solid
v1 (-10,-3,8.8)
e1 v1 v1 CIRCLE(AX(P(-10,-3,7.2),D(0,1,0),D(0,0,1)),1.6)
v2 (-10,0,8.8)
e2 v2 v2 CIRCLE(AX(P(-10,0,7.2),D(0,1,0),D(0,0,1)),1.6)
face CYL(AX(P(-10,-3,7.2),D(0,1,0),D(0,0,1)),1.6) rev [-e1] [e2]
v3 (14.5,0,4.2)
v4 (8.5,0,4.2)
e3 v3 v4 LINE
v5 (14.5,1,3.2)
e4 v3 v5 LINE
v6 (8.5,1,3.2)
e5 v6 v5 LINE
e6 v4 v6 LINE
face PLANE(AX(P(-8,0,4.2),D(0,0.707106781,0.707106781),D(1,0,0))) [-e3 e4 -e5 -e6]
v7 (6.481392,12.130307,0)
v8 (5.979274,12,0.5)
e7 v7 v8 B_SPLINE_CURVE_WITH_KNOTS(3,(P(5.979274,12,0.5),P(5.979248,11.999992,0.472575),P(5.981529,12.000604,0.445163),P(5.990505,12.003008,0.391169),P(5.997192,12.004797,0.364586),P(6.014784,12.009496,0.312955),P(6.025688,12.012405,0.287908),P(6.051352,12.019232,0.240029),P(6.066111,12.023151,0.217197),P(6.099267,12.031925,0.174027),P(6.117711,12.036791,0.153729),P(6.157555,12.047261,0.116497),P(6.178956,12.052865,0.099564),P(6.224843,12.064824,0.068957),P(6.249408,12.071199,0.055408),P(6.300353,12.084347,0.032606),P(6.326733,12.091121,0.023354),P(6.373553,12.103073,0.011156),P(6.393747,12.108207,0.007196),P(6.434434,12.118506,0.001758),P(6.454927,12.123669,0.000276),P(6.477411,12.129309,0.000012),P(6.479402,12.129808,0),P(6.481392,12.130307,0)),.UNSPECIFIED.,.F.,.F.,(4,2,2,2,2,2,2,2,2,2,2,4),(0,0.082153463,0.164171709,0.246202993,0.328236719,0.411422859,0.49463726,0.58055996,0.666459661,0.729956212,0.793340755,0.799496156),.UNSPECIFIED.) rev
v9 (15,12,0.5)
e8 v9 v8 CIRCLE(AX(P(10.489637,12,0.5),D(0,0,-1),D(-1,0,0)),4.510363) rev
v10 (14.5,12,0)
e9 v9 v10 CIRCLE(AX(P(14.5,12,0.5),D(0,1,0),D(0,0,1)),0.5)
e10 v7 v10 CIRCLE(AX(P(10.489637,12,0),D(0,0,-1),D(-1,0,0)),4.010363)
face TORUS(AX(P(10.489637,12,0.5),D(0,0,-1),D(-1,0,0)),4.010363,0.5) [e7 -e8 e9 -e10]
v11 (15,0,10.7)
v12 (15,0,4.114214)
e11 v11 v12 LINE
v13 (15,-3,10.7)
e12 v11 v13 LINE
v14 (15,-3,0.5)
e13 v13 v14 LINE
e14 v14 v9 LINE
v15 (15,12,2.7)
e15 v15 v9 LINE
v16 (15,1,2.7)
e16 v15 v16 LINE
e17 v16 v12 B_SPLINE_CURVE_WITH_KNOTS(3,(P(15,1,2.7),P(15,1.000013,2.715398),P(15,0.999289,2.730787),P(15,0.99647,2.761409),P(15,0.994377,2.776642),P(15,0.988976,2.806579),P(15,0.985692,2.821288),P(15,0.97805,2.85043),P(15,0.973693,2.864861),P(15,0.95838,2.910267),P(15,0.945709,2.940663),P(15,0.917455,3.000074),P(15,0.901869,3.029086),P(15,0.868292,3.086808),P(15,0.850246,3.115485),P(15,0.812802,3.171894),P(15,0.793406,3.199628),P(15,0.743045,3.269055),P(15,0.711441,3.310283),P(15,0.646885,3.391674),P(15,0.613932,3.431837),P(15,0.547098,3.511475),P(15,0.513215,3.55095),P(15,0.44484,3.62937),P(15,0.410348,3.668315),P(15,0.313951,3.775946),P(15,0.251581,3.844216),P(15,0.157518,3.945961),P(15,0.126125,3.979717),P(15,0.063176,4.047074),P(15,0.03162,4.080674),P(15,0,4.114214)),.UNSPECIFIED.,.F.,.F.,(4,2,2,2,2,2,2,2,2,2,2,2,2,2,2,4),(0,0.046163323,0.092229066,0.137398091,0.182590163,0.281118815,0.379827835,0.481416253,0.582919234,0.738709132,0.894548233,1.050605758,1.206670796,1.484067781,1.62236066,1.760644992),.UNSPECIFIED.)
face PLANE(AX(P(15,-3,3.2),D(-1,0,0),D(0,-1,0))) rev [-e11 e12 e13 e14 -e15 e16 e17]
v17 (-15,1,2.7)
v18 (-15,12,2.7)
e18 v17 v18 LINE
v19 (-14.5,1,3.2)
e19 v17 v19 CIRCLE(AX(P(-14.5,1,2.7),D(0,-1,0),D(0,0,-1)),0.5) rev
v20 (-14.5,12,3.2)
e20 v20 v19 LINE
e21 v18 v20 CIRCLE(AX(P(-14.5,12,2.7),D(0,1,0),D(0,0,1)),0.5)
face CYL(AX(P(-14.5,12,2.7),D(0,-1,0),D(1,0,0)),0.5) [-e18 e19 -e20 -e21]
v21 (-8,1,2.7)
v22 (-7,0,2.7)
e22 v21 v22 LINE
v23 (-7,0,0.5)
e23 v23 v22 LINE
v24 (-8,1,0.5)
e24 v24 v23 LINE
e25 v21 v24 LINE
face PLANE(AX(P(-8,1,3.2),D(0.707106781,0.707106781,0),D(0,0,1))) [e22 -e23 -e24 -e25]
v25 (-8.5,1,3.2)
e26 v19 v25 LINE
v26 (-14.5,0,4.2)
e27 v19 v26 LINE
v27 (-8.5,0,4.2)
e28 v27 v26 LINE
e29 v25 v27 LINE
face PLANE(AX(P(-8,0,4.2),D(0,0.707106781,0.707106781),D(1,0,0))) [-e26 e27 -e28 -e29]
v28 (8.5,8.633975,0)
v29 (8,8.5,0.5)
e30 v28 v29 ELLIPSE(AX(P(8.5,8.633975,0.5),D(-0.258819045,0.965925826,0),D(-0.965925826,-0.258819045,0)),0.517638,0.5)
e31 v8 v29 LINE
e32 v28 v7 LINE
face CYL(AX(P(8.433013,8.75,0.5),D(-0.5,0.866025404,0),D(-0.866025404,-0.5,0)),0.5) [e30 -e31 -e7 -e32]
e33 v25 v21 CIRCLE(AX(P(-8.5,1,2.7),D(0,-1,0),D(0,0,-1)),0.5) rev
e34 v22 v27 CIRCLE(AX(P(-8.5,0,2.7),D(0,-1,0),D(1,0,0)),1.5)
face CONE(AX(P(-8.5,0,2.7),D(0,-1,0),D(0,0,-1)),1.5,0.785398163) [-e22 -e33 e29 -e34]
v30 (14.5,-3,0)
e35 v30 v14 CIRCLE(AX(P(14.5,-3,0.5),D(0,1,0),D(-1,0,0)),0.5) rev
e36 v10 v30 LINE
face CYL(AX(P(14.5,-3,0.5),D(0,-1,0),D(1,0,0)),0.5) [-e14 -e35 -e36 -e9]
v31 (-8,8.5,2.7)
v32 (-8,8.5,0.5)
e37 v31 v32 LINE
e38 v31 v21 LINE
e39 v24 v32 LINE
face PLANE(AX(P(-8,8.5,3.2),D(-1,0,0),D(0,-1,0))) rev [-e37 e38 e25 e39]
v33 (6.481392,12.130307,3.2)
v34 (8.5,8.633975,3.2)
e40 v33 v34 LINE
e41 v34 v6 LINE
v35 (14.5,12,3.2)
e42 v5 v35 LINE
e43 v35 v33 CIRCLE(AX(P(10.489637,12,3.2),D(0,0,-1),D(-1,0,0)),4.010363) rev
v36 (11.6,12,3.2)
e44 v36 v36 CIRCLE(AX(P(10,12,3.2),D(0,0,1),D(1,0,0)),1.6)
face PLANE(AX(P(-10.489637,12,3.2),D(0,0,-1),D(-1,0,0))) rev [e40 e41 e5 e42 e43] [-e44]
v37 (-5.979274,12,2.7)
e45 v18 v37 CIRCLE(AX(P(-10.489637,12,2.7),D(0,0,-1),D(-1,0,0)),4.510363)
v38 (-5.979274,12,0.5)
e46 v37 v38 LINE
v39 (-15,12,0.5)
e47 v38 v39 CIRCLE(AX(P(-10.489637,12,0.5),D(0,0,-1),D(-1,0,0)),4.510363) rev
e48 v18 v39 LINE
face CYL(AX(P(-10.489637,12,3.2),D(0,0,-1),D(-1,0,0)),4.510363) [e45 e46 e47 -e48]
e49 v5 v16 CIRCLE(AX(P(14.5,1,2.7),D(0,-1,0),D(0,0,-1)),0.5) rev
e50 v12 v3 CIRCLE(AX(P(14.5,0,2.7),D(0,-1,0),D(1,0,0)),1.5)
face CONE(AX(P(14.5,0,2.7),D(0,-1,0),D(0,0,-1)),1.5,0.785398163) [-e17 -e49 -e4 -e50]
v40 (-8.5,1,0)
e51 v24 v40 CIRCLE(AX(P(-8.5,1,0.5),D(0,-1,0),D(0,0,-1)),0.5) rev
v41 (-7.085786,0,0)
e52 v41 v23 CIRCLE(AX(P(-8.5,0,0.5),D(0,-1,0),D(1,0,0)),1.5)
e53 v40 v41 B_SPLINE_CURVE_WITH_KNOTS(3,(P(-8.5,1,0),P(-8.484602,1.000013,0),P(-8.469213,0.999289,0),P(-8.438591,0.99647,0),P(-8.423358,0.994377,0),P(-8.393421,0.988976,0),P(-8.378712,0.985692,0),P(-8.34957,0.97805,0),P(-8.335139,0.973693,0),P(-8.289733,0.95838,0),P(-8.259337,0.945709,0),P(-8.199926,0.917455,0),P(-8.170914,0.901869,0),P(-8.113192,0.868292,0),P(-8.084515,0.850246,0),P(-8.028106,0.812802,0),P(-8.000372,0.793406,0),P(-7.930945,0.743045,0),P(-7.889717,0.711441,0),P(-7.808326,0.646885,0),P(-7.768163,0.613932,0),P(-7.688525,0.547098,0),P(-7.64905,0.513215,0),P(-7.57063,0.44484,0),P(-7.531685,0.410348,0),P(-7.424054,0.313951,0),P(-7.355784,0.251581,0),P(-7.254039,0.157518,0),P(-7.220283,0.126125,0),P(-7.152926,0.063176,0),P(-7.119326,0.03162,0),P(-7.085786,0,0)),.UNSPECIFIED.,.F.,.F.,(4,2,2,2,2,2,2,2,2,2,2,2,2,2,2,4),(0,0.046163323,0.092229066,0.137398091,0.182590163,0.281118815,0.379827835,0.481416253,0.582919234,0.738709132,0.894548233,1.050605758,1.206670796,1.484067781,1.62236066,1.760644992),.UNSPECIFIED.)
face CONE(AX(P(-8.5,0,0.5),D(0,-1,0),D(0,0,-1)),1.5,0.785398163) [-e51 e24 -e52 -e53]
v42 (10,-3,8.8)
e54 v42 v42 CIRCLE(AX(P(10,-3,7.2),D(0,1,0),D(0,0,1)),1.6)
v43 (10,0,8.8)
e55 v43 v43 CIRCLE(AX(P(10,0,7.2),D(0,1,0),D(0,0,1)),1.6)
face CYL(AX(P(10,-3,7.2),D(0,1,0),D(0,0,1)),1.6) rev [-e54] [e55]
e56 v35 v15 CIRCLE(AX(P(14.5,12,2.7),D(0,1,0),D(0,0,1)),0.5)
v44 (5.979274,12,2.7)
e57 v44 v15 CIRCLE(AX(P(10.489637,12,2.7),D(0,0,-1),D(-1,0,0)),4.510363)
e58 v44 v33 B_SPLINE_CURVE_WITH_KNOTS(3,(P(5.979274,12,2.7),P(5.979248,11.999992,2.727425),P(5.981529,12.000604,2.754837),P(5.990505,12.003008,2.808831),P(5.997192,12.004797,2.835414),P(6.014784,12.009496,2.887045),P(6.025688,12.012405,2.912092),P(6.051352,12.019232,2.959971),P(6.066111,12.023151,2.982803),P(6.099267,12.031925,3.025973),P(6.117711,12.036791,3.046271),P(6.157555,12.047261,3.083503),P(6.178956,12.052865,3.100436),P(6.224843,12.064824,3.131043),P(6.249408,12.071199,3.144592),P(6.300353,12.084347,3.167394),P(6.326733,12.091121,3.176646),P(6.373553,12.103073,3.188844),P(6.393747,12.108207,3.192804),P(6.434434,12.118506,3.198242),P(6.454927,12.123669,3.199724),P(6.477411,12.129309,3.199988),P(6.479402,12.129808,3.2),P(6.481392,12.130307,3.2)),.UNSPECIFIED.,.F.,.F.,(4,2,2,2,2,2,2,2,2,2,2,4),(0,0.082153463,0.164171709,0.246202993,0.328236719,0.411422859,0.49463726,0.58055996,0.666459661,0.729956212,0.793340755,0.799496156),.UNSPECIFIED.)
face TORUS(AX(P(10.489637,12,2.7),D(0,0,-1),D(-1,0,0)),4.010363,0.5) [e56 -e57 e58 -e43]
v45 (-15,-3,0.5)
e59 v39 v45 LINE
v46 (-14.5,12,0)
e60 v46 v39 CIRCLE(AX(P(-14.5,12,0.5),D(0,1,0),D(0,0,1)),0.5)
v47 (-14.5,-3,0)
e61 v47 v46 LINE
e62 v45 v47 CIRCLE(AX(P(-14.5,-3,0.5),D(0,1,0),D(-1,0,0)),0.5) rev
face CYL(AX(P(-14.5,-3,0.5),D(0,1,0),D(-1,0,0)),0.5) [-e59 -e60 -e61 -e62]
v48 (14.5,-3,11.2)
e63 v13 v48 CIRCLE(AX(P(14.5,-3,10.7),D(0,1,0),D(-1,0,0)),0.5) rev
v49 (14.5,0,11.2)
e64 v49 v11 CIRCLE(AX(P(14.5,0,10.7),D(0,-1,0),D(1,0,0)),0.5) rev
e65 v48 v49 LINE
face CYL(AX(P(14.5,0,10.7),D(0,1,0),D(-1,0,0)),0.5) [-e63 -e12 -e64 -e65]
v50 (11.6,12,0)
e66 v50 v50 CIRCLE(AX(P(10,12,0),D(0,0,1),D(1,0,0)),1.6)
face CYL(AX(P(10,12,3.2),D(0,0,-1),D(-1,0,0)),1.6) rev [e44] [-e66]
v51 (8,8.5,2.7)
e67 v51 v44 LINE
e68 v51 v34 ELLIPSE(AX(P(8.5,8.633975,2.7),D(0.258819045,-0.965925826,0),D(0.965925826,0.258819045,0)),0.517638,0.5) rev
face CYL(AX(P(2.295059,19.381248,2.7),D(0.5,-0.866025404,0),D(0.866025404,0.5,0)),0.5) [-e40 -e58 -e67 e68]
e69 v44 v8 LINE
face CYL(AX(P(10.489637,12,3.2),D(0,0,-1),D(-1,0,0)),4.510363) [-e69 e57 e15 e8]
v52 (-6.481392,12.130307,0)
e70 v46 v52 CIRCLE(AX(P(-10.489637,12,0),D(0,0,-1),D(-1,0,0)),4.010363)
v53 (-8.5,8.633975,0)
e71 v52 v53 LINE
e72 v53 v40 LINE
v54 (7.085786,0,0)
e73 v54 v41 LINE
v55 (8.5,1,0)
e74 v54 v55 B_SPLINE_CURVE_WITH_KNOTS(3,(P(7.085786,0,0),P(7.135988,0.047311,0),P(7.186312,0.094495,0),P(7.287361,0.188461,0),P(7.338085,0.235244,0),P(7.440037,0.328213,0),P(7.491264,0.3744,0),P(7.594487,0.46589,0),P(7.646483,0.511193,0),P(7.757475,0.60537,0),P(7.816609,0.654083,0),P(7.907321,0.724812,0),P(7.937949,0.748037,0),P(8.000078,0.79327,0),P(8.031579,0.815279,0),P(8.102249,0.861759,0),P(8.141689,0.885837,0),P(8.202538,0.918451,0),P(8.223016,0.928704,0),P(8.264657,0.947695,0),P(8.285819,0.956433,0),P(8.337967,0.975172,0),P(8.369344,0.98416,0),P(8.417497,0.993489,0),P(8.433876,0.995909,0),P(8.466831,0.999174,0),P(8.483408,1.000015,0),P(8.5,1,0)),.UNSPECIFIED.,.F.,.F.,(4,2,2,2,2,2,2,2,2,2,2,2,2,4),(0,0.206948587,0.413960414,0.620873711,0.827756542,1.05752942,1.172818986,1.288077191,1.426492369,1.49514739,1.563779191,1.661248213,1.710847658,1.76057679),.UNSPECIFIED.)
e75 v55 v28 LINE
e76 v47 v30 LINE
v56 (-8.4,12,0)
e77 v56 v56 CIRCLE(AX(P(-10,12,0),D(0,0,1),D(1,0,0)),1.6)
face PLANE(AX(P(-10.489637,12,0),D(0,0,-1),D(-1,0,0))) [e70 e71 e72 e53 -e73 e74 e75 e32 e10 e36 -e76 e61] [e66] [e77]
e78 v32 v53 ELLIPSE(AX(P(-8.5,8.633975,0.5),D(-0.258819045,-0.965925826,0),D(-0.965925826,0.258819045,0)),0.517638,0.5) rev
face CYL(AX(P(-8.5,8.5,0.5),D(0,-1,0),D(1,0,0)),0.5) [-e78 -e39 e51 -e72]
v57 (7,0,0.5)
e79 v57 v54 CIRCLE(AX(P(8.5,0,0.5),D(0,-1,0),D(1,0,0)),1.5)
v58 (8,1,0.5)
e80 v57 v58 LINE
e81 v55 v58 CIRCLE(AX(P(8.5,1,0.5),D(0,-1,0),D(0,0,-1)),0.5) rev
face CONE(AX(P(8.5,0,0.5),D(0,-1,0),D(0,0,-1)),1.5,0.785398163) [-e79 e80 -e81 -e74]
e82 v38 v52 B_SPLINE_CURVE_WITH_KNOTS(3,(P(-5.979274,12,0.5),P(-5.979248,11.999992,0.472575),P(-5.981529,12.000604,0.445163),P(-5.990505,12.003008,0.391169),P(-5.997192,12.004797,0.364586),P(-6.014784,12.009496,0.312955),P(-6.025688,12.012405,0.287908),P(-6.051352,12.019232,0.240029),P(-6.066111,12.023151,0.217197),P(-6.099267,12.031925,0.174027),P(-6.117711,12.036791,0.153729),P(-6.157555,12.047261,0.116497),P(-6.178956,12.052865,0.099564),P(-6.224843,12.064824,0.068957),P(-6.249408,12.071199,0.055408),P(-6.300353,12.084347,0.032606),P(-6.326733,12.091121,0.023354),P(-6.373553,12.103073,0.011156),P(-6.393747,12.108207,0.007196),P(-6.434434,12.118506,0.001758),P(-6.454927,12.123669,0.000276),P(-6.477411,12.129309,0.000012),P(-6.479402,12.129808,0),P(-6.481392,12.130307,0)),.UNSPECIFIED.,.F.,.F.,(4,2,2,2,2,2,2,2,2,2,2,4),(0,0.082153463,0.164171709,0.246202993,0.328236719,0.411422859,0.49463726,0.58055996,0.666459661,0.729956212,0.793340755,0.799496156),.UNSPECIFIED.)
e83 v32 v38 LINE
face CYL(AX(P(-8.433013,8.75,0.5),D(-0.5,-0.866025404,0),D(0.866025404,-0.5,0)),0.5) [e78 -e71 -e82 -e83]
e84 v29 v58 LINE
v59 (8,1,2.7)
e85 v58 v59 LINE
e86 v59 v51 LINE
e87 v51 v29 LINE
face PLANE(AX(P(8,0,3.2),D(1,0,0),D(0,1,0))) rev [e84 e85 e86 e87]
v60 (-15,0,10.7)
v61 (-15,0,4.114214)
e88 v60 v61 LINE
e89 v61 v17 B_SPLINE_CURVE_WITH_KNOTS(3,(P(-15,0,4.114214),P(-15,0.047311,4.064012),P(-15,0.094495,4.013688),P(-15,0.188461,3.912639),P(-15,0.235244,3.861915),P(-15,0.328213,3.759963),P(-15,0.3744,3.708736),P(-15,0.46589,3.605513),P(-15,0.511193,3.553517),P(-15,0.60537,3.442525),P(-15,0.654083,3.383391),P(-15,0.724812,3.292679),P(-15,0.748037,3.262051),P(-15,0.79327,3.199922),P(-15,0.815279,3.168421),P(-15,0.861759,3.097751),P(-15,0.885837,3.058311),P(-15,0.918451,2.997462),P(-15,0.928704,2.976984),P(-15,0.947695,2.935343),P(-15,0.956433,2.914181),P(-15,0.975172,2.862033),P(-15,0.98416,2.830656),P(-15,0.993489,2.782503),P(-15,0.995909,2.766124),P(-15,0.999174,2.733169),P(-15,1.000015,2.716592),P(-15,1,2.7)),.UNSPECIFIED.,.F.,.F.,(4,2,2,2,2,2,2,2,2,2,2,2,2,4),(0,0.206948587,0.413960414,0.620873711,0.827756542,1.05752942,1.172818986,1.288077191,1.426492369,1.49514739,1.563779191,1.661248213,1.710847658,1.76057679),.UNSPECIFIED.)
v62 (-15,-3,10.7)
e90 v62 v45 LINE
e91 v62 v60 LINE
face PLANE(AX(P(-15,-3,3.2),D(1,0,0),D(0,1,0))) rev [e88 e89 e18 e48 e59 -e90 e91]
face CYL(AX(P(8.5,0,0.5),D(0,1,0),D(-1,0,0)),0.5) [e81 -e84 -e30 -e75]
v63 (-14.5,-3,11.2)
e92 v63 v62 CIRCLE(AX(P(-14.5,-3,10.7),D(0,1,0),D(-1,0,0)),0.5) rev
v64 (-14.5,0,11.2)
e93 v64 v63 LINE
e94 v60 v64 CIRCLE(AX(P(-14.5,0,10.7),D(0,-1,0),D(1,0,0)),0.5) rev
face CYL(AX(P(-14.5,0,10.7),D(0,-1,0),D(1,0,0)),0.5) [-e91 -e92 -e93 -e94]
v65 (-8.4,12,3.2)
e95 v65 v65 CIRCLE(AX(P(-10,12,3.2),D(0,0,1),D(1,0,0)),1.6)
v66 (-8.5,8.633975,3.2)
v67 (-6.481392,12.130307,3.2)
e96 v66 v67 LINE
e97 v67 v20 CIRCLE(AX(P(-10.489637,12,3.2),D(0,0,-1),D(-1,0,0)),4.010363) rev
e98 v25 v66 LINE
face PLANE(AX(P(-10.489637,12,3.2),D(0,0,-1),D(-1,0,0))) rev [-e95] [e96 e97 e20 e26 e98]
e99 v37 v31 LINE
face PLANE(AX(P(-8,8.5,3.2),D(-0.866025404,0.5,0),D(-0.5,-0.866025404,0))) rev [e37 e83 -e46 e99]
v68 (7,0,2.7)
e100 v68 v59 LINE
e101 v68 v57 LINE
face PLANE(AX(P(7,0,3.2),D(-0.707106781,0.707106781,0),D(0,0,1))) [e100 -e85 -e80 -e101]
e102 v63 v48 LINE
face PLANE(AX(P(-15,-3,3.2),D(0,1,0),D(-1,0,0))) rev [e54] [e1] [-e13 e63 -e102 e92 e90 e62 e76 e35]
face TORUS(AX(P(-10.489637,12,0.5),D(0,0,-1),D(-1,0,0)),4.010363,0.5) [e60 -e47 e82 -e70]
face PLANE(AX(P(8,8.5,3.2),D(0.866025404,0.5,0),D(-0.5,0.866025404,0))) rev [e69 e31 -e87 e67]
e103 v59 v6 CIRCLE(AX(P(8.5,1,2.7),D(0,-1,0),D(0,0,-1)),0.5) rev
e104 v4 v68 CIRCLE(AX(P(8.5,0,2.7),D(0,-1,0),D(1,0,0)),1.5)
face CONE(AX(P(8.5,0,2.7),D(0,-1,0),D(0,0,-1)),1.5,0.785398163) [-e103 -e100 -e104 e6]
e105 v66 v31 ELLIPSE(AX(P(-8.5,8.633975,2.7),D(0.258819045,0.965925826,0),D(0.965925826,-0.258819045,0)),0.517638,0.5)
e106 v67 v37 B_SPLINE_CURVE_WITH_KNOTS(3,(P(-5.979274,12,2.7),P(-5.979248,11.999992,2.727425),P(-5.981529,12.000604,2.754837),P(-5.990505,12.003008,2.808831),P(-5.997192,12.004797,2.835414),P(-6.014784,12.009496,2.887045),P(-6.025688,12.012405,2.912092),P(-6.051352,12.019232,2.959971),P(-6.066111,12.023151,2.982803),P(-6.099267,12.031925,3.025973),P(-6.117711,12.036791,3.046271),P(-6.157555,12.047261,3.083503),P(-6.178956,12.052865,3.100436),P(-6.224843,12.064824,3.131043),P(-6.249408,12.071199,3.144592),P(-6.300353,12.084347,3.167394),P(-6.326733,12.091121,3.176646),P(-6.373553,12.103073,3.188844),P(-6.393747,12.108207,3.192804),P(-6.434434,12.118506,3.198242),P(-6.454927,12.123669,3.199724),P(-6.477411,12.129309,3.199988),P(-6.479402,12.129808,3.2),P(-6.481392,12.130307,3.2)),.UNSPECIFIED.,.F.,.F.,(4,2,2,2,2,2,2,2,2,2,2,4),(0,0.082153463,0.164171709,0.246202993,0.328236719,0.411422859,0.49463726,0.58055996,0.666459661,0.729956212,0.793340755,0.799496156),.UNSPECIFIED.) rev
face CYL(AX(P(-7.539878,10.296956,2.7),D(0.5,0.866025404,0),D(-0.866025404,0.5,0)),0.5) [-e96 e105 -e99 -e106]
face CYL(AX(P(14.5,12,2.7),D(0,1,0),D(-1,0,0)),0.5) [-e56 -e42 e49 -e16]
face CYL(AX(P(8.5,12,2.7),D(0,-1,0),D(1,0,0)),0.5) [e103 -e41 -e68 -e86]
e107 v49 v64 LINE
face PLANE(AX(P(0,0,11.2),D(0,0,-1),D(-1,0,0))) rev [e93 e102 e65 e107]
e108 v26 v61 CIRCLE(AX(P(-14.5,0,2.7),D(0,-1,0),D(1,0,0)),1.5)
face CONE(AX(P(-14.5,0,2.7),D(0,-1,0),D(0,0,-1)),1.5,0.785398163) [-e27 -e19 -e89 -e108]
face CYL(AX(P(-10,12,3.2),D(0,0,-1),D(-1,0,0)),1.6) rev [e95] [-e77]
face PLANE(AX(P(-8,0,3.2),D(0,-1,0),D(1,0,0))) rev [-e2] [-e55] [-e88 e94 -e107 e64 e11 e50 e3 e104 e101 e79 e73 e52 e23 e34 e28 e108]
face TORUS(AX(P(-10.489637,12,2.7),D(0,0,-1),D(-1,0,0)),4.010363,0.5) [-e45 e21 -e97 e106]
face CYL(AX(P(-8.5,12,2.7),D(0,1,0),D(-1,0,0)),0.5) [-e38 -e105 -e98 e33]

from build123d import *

# Parameters (mm, degrees)
SKETCH1_R           = 1.6
BOSS_EXTRUDE1_DEPTH = 3.2
SKETCH2_W           = 30
SKETCH2_H           = 3
BOSS_EXTRUDE2_DEPTH = 8
SKETCH3_R           = 1.6
CUT_EXTRUDE1_DEPTH  = 25.960610678
FILLET1_R           = 0.5
CHAMFER1_SIZE       = 1


with BuildPart() as part:
    # Sketch1 → Boss-Extrude1 (new body)
    with BuildSketch(Plane.XY):
        with BuildLine():
            Line((-15, -3), (15, -3))
            Line((15, -3), (15, 12))
            ThreePointArc((15, 12), (10.489637029, 16.510362971), (5.979274058, 12))
            Line((5.979274058, 12), (8, 8.5))
            Line((8, 8.5), (8, 0))
            Line((8, 0), (-8, 0))
            Line((-8, 0), (-8, 8.5))
            Line((-8, 8.5), (-5.979274058, 12))
            ThreePointArc((-5.979274058, 12), (-10.489637029, 16.510362971), (-15, 12))
            Line((-15, 12), (-15, -3))
        make_face()
        with Locations((-10, 12)):
            Circle(SKETCH1_R, mode=Mode.SUBTRACT)
        with Locations((10, 12)):
            Circle(SKETCH1_R, mode=Mode.SUBTRACT)
    extrude(amount=BOSS_EXTRUDE1_DEPTH)

    # Sketch2 → Boss-Extrude2 (add)
    with BuildSketch(Plane.XY.offset(3.2)):
        with Locations((0, -1.5)):
            Rectangle(SKETCH2_W, SKETCH2_H)
    extrude(amount=BOSS_EXTRUDE2_DEPTH)

    # Sketch3 → Cut-Extrude1 (cut, through all)
    with BuildSketch(Plane(origin=(0, 0, 0), x_dir=(1, 0, 0), z_dir=(0, 1, 0))):
        with Locations(Location((-10, -7.2, 0), (0, 0, 270))):
            Circle(SKETCH3_R)
        with Locations(Location((10, -7.2, 0), (0, 0, 270))):
            Circle(SKETCH3_R)
    extrude(amount=-CUT_EXTRUDE1_DEPTH, mode=Mode.SUBTRACT)

    # Fillet1
    fillet1_edges = [part.edges().sort_by_distance(p)[0] for p in [
        (8, 4.25, 0),
        (6.989637029, 10.25, 0),
        (10.489637029, 16.510362971, 0),
        (15, 4.5, 0),
        (-15, 4.5, 0),
        (-10.489637029, 16.510362971, 0),
        (10.489637029, 16.510362971, 3.2),
        (6.989637029, 10.25, 3.2),
        (8, 4.25, 3.2),
        (-8, 4.25, 3.2),
        (-6.989637029, 10.25, 3.2),
        (15, 6, 3.2),
        (-10.489637029, 16.510362971, 3.2),
        (-15, -1.5, 11.2),
        (15, -1.5, 11.2),
        (-15, 6, 3.2),
        (-6.989637029, 10.25, 0),
        (-8, 4.25, 0),
    ]]
    fillet(fillet1_edges, radius=FILLET1_R)

    # Chamfer1
    # the kernel refuses this chamfer: 1 mm, written as the material it adds along each edge
    with BuildSketch(Plane(origin=(-8.5, 0, 3.2), x_dir=(0, 0.9996219169112968, -0.027495876610586494), z_dir=(-1, 0, 0)), Plane(origin=(14.5, 0, 3.2), x_dir=(0, 0.9996219169112968, -0.027495876610586494), z_dir=(-1, 0, 0))) as chamfer1_piece_1:
        Polygon((CHAMFER1_SIZE * 0.999621916911, -CHAMFER1_SIZE * 0.0274958766106), (-CHAMFER1_SIZE * 0.0274958766106, -CHAMFER1_SIZE * 0.999621916911), (0, 0), align=None)
    extrude(amount=6)
    with BuildSketch(Plane(origin=(-8, 0, 0.5), x_dir=(-0.02749587661058563, 0.9996219169112968, 0), z_dir=(0, 0, 1))) as chamfer1_piece_2:
        Polygon((CHAMFER1_SIZE * 0.999621916911, -CHAMFER1_SIZE * 0.0274958766106), (-CHAMFER1_SIZE * 0.0274958766106, -CHAMFER1_SIZE * 0.999621916911), (0, 0), align=None)
    extrude(amount=2.2)
    with BuildSketch(Plane(origin=(8, 0, 0.5), x_dir=(0.027495876610585633, 0.9996219169112968, 0), z_dir=(0, 0, 1))) as chamfer1_piece_3:
        Polygon((CHAMFER1_SIZE * 0.999621916911, CHAMFER1_SIZE * 0.0274958766106), (-CHAMFER1_SIZE * 0.0274958766106, CHAMFER1_SIZE * 0.999621916911), (0, 0), align=None)
    extrude(amount=2.2)
    with BuildSketch(Plane(origin=(-14.5, 0, 2.7), x_dir=(0.006283143965557512, 0, 0.9999802608561372), z_dir=(-0.9999802608561372, 0, 0.006283143965557512))) as chamfer1_piece_4_section:
        Polygon((-0.5 - CHAMFER1_SIZE, 0), (-0.5, CHAMFER1_SIZE), (-0.5, 0), align=None)
    chamfer1_piece_4 = revolve(axis=Axis((-14.5, 0, 2.7), (0, 1, 0)), revolution_arc=359.64, mode=Mode.PRIVATE)
    chamfer1_piece_4 = split(chamfer1_piece_4, bisect_by=Plane(origin=(-15, 0.469782675, 3.086220861), z_dir=(1, 0, 0)), keep=Keep.TOP, mode=Mode.PRIVATE)
    add(chamfer1_piece_4)
    with BuildSketch(Plane(origin=(-8.5, 0, 0.5), x_dir=(0.9999802608561372, 0, 0.006283143965558622), z_dir=(0.006283143965558622, 0, -0.9999802608561372))) as chamfer1_piece_5_section:
        Polygon((-0.5, -CHAMFER1_SIZE), (-0.5 - CHAMFER1_SIZE, 0), (-0.5, 0), align=None)
    chamfer1_piece_5 = revolve(axis=Axis((-8.5, 0, 0.5), (0, -1, 0)), revolution_arc=359.64, mode=Mode.PRIVATE)
    chamfer1_piece_5 = split(chamfer1_piece_5, bisect_by=Plane(origin=(-8.113779143, 0.469782674, 0), z_dir=(0, 0, 1)), keep=Keep.TOP, mode=Mode.PRIVATE)
    add(chamfer1_piece_5)
    with BuildSketch(Plane(origin=(8.5, 0, 2.7), x_dir=(-1, 0, 0), z_dir=(0, 0, -1))) as chamfer1_piece_6:
        Polygon((0.5, CHAMFER1_SIZE), (0.5 + CHAMFER1_SIZE, 0), (0.5, 0), align=None)
    revolve(axis=Axis((8.5, 0, 2.7), (0, 1, 0)), revolution_arc=90)
    with BuildSketch(Plane(origin=(8.5, 0, 0.5), x_dir=(-0.9999802608561372, 0, 0.006283143965558622), z_dir=(-0.006283143965558622, 0, -0.9999802608561372))) as chamfer1_piece_7_section:
        Polygon((-0.5, CHAMFER1_SIZE), (-0.5 - CHAMFER1_SIZE, 0), (-0.5, 0), align=None)
    chamfer1_piece_7 = revolve(axis=Axis((8.5, 0, 0.5), (0, 1, 0)), revolution_arc=359.64, mode=Mode.PRIVATE)
    chamfer1_piece_7 = split(chamfer1_piece_7, bisect_by=Plane(origin=(8.113779139, 0.469782675, 0), z_dir=(0, 0, 1)), keep=Keep.TOP, mode=Mode.PRIVATE)
    add(chamfer1_piece_7)
    with BuildSketch(Plane(origin=(14.5, 0, 2.7), x_dir=(0, 0, 1), z_dir=(-1, 0, 0))) as chamfer1_piece_8_section:
        Polygon((0.5, CHAMFER1_SIZE), (0.5 + CHAMFER1_SIZE, 0), (0.5, 0), align=None)
    chamfer1_piece_8 = revolve(axis=Axis((14.5, 0, 2.7), (0, 1, 0)), revolution_arc=359.64, mode=Mode.PRIVATE)
    chamfer1_piece_8 = split(chamfer1_piece_8, bisect_by=Plane(origin=(15, 0.469782675, 3.086220861), z_dir=(-1, 0, 0)), keep=Keep.TOP, mode=Mode.PRIVATE)
    add(chamfer1_piece_8)
    with BuildSketch(Plane(origin=(-8.5, 0, 2.7), x_dir=(0, 0, 1), z_dir=(-1, 0, 0))) as chamfer1_piece_9:
        Polygon((0.5, CHAMFER1_SIZE), (0.5 + CHAMFER1_SIZE, 0), (0.5, 0), align=None)
    revolve(axis=Axis((-8.5, 0, 2.7), (0, 1, 0)), revolution_arc=90)


solid = part.part
